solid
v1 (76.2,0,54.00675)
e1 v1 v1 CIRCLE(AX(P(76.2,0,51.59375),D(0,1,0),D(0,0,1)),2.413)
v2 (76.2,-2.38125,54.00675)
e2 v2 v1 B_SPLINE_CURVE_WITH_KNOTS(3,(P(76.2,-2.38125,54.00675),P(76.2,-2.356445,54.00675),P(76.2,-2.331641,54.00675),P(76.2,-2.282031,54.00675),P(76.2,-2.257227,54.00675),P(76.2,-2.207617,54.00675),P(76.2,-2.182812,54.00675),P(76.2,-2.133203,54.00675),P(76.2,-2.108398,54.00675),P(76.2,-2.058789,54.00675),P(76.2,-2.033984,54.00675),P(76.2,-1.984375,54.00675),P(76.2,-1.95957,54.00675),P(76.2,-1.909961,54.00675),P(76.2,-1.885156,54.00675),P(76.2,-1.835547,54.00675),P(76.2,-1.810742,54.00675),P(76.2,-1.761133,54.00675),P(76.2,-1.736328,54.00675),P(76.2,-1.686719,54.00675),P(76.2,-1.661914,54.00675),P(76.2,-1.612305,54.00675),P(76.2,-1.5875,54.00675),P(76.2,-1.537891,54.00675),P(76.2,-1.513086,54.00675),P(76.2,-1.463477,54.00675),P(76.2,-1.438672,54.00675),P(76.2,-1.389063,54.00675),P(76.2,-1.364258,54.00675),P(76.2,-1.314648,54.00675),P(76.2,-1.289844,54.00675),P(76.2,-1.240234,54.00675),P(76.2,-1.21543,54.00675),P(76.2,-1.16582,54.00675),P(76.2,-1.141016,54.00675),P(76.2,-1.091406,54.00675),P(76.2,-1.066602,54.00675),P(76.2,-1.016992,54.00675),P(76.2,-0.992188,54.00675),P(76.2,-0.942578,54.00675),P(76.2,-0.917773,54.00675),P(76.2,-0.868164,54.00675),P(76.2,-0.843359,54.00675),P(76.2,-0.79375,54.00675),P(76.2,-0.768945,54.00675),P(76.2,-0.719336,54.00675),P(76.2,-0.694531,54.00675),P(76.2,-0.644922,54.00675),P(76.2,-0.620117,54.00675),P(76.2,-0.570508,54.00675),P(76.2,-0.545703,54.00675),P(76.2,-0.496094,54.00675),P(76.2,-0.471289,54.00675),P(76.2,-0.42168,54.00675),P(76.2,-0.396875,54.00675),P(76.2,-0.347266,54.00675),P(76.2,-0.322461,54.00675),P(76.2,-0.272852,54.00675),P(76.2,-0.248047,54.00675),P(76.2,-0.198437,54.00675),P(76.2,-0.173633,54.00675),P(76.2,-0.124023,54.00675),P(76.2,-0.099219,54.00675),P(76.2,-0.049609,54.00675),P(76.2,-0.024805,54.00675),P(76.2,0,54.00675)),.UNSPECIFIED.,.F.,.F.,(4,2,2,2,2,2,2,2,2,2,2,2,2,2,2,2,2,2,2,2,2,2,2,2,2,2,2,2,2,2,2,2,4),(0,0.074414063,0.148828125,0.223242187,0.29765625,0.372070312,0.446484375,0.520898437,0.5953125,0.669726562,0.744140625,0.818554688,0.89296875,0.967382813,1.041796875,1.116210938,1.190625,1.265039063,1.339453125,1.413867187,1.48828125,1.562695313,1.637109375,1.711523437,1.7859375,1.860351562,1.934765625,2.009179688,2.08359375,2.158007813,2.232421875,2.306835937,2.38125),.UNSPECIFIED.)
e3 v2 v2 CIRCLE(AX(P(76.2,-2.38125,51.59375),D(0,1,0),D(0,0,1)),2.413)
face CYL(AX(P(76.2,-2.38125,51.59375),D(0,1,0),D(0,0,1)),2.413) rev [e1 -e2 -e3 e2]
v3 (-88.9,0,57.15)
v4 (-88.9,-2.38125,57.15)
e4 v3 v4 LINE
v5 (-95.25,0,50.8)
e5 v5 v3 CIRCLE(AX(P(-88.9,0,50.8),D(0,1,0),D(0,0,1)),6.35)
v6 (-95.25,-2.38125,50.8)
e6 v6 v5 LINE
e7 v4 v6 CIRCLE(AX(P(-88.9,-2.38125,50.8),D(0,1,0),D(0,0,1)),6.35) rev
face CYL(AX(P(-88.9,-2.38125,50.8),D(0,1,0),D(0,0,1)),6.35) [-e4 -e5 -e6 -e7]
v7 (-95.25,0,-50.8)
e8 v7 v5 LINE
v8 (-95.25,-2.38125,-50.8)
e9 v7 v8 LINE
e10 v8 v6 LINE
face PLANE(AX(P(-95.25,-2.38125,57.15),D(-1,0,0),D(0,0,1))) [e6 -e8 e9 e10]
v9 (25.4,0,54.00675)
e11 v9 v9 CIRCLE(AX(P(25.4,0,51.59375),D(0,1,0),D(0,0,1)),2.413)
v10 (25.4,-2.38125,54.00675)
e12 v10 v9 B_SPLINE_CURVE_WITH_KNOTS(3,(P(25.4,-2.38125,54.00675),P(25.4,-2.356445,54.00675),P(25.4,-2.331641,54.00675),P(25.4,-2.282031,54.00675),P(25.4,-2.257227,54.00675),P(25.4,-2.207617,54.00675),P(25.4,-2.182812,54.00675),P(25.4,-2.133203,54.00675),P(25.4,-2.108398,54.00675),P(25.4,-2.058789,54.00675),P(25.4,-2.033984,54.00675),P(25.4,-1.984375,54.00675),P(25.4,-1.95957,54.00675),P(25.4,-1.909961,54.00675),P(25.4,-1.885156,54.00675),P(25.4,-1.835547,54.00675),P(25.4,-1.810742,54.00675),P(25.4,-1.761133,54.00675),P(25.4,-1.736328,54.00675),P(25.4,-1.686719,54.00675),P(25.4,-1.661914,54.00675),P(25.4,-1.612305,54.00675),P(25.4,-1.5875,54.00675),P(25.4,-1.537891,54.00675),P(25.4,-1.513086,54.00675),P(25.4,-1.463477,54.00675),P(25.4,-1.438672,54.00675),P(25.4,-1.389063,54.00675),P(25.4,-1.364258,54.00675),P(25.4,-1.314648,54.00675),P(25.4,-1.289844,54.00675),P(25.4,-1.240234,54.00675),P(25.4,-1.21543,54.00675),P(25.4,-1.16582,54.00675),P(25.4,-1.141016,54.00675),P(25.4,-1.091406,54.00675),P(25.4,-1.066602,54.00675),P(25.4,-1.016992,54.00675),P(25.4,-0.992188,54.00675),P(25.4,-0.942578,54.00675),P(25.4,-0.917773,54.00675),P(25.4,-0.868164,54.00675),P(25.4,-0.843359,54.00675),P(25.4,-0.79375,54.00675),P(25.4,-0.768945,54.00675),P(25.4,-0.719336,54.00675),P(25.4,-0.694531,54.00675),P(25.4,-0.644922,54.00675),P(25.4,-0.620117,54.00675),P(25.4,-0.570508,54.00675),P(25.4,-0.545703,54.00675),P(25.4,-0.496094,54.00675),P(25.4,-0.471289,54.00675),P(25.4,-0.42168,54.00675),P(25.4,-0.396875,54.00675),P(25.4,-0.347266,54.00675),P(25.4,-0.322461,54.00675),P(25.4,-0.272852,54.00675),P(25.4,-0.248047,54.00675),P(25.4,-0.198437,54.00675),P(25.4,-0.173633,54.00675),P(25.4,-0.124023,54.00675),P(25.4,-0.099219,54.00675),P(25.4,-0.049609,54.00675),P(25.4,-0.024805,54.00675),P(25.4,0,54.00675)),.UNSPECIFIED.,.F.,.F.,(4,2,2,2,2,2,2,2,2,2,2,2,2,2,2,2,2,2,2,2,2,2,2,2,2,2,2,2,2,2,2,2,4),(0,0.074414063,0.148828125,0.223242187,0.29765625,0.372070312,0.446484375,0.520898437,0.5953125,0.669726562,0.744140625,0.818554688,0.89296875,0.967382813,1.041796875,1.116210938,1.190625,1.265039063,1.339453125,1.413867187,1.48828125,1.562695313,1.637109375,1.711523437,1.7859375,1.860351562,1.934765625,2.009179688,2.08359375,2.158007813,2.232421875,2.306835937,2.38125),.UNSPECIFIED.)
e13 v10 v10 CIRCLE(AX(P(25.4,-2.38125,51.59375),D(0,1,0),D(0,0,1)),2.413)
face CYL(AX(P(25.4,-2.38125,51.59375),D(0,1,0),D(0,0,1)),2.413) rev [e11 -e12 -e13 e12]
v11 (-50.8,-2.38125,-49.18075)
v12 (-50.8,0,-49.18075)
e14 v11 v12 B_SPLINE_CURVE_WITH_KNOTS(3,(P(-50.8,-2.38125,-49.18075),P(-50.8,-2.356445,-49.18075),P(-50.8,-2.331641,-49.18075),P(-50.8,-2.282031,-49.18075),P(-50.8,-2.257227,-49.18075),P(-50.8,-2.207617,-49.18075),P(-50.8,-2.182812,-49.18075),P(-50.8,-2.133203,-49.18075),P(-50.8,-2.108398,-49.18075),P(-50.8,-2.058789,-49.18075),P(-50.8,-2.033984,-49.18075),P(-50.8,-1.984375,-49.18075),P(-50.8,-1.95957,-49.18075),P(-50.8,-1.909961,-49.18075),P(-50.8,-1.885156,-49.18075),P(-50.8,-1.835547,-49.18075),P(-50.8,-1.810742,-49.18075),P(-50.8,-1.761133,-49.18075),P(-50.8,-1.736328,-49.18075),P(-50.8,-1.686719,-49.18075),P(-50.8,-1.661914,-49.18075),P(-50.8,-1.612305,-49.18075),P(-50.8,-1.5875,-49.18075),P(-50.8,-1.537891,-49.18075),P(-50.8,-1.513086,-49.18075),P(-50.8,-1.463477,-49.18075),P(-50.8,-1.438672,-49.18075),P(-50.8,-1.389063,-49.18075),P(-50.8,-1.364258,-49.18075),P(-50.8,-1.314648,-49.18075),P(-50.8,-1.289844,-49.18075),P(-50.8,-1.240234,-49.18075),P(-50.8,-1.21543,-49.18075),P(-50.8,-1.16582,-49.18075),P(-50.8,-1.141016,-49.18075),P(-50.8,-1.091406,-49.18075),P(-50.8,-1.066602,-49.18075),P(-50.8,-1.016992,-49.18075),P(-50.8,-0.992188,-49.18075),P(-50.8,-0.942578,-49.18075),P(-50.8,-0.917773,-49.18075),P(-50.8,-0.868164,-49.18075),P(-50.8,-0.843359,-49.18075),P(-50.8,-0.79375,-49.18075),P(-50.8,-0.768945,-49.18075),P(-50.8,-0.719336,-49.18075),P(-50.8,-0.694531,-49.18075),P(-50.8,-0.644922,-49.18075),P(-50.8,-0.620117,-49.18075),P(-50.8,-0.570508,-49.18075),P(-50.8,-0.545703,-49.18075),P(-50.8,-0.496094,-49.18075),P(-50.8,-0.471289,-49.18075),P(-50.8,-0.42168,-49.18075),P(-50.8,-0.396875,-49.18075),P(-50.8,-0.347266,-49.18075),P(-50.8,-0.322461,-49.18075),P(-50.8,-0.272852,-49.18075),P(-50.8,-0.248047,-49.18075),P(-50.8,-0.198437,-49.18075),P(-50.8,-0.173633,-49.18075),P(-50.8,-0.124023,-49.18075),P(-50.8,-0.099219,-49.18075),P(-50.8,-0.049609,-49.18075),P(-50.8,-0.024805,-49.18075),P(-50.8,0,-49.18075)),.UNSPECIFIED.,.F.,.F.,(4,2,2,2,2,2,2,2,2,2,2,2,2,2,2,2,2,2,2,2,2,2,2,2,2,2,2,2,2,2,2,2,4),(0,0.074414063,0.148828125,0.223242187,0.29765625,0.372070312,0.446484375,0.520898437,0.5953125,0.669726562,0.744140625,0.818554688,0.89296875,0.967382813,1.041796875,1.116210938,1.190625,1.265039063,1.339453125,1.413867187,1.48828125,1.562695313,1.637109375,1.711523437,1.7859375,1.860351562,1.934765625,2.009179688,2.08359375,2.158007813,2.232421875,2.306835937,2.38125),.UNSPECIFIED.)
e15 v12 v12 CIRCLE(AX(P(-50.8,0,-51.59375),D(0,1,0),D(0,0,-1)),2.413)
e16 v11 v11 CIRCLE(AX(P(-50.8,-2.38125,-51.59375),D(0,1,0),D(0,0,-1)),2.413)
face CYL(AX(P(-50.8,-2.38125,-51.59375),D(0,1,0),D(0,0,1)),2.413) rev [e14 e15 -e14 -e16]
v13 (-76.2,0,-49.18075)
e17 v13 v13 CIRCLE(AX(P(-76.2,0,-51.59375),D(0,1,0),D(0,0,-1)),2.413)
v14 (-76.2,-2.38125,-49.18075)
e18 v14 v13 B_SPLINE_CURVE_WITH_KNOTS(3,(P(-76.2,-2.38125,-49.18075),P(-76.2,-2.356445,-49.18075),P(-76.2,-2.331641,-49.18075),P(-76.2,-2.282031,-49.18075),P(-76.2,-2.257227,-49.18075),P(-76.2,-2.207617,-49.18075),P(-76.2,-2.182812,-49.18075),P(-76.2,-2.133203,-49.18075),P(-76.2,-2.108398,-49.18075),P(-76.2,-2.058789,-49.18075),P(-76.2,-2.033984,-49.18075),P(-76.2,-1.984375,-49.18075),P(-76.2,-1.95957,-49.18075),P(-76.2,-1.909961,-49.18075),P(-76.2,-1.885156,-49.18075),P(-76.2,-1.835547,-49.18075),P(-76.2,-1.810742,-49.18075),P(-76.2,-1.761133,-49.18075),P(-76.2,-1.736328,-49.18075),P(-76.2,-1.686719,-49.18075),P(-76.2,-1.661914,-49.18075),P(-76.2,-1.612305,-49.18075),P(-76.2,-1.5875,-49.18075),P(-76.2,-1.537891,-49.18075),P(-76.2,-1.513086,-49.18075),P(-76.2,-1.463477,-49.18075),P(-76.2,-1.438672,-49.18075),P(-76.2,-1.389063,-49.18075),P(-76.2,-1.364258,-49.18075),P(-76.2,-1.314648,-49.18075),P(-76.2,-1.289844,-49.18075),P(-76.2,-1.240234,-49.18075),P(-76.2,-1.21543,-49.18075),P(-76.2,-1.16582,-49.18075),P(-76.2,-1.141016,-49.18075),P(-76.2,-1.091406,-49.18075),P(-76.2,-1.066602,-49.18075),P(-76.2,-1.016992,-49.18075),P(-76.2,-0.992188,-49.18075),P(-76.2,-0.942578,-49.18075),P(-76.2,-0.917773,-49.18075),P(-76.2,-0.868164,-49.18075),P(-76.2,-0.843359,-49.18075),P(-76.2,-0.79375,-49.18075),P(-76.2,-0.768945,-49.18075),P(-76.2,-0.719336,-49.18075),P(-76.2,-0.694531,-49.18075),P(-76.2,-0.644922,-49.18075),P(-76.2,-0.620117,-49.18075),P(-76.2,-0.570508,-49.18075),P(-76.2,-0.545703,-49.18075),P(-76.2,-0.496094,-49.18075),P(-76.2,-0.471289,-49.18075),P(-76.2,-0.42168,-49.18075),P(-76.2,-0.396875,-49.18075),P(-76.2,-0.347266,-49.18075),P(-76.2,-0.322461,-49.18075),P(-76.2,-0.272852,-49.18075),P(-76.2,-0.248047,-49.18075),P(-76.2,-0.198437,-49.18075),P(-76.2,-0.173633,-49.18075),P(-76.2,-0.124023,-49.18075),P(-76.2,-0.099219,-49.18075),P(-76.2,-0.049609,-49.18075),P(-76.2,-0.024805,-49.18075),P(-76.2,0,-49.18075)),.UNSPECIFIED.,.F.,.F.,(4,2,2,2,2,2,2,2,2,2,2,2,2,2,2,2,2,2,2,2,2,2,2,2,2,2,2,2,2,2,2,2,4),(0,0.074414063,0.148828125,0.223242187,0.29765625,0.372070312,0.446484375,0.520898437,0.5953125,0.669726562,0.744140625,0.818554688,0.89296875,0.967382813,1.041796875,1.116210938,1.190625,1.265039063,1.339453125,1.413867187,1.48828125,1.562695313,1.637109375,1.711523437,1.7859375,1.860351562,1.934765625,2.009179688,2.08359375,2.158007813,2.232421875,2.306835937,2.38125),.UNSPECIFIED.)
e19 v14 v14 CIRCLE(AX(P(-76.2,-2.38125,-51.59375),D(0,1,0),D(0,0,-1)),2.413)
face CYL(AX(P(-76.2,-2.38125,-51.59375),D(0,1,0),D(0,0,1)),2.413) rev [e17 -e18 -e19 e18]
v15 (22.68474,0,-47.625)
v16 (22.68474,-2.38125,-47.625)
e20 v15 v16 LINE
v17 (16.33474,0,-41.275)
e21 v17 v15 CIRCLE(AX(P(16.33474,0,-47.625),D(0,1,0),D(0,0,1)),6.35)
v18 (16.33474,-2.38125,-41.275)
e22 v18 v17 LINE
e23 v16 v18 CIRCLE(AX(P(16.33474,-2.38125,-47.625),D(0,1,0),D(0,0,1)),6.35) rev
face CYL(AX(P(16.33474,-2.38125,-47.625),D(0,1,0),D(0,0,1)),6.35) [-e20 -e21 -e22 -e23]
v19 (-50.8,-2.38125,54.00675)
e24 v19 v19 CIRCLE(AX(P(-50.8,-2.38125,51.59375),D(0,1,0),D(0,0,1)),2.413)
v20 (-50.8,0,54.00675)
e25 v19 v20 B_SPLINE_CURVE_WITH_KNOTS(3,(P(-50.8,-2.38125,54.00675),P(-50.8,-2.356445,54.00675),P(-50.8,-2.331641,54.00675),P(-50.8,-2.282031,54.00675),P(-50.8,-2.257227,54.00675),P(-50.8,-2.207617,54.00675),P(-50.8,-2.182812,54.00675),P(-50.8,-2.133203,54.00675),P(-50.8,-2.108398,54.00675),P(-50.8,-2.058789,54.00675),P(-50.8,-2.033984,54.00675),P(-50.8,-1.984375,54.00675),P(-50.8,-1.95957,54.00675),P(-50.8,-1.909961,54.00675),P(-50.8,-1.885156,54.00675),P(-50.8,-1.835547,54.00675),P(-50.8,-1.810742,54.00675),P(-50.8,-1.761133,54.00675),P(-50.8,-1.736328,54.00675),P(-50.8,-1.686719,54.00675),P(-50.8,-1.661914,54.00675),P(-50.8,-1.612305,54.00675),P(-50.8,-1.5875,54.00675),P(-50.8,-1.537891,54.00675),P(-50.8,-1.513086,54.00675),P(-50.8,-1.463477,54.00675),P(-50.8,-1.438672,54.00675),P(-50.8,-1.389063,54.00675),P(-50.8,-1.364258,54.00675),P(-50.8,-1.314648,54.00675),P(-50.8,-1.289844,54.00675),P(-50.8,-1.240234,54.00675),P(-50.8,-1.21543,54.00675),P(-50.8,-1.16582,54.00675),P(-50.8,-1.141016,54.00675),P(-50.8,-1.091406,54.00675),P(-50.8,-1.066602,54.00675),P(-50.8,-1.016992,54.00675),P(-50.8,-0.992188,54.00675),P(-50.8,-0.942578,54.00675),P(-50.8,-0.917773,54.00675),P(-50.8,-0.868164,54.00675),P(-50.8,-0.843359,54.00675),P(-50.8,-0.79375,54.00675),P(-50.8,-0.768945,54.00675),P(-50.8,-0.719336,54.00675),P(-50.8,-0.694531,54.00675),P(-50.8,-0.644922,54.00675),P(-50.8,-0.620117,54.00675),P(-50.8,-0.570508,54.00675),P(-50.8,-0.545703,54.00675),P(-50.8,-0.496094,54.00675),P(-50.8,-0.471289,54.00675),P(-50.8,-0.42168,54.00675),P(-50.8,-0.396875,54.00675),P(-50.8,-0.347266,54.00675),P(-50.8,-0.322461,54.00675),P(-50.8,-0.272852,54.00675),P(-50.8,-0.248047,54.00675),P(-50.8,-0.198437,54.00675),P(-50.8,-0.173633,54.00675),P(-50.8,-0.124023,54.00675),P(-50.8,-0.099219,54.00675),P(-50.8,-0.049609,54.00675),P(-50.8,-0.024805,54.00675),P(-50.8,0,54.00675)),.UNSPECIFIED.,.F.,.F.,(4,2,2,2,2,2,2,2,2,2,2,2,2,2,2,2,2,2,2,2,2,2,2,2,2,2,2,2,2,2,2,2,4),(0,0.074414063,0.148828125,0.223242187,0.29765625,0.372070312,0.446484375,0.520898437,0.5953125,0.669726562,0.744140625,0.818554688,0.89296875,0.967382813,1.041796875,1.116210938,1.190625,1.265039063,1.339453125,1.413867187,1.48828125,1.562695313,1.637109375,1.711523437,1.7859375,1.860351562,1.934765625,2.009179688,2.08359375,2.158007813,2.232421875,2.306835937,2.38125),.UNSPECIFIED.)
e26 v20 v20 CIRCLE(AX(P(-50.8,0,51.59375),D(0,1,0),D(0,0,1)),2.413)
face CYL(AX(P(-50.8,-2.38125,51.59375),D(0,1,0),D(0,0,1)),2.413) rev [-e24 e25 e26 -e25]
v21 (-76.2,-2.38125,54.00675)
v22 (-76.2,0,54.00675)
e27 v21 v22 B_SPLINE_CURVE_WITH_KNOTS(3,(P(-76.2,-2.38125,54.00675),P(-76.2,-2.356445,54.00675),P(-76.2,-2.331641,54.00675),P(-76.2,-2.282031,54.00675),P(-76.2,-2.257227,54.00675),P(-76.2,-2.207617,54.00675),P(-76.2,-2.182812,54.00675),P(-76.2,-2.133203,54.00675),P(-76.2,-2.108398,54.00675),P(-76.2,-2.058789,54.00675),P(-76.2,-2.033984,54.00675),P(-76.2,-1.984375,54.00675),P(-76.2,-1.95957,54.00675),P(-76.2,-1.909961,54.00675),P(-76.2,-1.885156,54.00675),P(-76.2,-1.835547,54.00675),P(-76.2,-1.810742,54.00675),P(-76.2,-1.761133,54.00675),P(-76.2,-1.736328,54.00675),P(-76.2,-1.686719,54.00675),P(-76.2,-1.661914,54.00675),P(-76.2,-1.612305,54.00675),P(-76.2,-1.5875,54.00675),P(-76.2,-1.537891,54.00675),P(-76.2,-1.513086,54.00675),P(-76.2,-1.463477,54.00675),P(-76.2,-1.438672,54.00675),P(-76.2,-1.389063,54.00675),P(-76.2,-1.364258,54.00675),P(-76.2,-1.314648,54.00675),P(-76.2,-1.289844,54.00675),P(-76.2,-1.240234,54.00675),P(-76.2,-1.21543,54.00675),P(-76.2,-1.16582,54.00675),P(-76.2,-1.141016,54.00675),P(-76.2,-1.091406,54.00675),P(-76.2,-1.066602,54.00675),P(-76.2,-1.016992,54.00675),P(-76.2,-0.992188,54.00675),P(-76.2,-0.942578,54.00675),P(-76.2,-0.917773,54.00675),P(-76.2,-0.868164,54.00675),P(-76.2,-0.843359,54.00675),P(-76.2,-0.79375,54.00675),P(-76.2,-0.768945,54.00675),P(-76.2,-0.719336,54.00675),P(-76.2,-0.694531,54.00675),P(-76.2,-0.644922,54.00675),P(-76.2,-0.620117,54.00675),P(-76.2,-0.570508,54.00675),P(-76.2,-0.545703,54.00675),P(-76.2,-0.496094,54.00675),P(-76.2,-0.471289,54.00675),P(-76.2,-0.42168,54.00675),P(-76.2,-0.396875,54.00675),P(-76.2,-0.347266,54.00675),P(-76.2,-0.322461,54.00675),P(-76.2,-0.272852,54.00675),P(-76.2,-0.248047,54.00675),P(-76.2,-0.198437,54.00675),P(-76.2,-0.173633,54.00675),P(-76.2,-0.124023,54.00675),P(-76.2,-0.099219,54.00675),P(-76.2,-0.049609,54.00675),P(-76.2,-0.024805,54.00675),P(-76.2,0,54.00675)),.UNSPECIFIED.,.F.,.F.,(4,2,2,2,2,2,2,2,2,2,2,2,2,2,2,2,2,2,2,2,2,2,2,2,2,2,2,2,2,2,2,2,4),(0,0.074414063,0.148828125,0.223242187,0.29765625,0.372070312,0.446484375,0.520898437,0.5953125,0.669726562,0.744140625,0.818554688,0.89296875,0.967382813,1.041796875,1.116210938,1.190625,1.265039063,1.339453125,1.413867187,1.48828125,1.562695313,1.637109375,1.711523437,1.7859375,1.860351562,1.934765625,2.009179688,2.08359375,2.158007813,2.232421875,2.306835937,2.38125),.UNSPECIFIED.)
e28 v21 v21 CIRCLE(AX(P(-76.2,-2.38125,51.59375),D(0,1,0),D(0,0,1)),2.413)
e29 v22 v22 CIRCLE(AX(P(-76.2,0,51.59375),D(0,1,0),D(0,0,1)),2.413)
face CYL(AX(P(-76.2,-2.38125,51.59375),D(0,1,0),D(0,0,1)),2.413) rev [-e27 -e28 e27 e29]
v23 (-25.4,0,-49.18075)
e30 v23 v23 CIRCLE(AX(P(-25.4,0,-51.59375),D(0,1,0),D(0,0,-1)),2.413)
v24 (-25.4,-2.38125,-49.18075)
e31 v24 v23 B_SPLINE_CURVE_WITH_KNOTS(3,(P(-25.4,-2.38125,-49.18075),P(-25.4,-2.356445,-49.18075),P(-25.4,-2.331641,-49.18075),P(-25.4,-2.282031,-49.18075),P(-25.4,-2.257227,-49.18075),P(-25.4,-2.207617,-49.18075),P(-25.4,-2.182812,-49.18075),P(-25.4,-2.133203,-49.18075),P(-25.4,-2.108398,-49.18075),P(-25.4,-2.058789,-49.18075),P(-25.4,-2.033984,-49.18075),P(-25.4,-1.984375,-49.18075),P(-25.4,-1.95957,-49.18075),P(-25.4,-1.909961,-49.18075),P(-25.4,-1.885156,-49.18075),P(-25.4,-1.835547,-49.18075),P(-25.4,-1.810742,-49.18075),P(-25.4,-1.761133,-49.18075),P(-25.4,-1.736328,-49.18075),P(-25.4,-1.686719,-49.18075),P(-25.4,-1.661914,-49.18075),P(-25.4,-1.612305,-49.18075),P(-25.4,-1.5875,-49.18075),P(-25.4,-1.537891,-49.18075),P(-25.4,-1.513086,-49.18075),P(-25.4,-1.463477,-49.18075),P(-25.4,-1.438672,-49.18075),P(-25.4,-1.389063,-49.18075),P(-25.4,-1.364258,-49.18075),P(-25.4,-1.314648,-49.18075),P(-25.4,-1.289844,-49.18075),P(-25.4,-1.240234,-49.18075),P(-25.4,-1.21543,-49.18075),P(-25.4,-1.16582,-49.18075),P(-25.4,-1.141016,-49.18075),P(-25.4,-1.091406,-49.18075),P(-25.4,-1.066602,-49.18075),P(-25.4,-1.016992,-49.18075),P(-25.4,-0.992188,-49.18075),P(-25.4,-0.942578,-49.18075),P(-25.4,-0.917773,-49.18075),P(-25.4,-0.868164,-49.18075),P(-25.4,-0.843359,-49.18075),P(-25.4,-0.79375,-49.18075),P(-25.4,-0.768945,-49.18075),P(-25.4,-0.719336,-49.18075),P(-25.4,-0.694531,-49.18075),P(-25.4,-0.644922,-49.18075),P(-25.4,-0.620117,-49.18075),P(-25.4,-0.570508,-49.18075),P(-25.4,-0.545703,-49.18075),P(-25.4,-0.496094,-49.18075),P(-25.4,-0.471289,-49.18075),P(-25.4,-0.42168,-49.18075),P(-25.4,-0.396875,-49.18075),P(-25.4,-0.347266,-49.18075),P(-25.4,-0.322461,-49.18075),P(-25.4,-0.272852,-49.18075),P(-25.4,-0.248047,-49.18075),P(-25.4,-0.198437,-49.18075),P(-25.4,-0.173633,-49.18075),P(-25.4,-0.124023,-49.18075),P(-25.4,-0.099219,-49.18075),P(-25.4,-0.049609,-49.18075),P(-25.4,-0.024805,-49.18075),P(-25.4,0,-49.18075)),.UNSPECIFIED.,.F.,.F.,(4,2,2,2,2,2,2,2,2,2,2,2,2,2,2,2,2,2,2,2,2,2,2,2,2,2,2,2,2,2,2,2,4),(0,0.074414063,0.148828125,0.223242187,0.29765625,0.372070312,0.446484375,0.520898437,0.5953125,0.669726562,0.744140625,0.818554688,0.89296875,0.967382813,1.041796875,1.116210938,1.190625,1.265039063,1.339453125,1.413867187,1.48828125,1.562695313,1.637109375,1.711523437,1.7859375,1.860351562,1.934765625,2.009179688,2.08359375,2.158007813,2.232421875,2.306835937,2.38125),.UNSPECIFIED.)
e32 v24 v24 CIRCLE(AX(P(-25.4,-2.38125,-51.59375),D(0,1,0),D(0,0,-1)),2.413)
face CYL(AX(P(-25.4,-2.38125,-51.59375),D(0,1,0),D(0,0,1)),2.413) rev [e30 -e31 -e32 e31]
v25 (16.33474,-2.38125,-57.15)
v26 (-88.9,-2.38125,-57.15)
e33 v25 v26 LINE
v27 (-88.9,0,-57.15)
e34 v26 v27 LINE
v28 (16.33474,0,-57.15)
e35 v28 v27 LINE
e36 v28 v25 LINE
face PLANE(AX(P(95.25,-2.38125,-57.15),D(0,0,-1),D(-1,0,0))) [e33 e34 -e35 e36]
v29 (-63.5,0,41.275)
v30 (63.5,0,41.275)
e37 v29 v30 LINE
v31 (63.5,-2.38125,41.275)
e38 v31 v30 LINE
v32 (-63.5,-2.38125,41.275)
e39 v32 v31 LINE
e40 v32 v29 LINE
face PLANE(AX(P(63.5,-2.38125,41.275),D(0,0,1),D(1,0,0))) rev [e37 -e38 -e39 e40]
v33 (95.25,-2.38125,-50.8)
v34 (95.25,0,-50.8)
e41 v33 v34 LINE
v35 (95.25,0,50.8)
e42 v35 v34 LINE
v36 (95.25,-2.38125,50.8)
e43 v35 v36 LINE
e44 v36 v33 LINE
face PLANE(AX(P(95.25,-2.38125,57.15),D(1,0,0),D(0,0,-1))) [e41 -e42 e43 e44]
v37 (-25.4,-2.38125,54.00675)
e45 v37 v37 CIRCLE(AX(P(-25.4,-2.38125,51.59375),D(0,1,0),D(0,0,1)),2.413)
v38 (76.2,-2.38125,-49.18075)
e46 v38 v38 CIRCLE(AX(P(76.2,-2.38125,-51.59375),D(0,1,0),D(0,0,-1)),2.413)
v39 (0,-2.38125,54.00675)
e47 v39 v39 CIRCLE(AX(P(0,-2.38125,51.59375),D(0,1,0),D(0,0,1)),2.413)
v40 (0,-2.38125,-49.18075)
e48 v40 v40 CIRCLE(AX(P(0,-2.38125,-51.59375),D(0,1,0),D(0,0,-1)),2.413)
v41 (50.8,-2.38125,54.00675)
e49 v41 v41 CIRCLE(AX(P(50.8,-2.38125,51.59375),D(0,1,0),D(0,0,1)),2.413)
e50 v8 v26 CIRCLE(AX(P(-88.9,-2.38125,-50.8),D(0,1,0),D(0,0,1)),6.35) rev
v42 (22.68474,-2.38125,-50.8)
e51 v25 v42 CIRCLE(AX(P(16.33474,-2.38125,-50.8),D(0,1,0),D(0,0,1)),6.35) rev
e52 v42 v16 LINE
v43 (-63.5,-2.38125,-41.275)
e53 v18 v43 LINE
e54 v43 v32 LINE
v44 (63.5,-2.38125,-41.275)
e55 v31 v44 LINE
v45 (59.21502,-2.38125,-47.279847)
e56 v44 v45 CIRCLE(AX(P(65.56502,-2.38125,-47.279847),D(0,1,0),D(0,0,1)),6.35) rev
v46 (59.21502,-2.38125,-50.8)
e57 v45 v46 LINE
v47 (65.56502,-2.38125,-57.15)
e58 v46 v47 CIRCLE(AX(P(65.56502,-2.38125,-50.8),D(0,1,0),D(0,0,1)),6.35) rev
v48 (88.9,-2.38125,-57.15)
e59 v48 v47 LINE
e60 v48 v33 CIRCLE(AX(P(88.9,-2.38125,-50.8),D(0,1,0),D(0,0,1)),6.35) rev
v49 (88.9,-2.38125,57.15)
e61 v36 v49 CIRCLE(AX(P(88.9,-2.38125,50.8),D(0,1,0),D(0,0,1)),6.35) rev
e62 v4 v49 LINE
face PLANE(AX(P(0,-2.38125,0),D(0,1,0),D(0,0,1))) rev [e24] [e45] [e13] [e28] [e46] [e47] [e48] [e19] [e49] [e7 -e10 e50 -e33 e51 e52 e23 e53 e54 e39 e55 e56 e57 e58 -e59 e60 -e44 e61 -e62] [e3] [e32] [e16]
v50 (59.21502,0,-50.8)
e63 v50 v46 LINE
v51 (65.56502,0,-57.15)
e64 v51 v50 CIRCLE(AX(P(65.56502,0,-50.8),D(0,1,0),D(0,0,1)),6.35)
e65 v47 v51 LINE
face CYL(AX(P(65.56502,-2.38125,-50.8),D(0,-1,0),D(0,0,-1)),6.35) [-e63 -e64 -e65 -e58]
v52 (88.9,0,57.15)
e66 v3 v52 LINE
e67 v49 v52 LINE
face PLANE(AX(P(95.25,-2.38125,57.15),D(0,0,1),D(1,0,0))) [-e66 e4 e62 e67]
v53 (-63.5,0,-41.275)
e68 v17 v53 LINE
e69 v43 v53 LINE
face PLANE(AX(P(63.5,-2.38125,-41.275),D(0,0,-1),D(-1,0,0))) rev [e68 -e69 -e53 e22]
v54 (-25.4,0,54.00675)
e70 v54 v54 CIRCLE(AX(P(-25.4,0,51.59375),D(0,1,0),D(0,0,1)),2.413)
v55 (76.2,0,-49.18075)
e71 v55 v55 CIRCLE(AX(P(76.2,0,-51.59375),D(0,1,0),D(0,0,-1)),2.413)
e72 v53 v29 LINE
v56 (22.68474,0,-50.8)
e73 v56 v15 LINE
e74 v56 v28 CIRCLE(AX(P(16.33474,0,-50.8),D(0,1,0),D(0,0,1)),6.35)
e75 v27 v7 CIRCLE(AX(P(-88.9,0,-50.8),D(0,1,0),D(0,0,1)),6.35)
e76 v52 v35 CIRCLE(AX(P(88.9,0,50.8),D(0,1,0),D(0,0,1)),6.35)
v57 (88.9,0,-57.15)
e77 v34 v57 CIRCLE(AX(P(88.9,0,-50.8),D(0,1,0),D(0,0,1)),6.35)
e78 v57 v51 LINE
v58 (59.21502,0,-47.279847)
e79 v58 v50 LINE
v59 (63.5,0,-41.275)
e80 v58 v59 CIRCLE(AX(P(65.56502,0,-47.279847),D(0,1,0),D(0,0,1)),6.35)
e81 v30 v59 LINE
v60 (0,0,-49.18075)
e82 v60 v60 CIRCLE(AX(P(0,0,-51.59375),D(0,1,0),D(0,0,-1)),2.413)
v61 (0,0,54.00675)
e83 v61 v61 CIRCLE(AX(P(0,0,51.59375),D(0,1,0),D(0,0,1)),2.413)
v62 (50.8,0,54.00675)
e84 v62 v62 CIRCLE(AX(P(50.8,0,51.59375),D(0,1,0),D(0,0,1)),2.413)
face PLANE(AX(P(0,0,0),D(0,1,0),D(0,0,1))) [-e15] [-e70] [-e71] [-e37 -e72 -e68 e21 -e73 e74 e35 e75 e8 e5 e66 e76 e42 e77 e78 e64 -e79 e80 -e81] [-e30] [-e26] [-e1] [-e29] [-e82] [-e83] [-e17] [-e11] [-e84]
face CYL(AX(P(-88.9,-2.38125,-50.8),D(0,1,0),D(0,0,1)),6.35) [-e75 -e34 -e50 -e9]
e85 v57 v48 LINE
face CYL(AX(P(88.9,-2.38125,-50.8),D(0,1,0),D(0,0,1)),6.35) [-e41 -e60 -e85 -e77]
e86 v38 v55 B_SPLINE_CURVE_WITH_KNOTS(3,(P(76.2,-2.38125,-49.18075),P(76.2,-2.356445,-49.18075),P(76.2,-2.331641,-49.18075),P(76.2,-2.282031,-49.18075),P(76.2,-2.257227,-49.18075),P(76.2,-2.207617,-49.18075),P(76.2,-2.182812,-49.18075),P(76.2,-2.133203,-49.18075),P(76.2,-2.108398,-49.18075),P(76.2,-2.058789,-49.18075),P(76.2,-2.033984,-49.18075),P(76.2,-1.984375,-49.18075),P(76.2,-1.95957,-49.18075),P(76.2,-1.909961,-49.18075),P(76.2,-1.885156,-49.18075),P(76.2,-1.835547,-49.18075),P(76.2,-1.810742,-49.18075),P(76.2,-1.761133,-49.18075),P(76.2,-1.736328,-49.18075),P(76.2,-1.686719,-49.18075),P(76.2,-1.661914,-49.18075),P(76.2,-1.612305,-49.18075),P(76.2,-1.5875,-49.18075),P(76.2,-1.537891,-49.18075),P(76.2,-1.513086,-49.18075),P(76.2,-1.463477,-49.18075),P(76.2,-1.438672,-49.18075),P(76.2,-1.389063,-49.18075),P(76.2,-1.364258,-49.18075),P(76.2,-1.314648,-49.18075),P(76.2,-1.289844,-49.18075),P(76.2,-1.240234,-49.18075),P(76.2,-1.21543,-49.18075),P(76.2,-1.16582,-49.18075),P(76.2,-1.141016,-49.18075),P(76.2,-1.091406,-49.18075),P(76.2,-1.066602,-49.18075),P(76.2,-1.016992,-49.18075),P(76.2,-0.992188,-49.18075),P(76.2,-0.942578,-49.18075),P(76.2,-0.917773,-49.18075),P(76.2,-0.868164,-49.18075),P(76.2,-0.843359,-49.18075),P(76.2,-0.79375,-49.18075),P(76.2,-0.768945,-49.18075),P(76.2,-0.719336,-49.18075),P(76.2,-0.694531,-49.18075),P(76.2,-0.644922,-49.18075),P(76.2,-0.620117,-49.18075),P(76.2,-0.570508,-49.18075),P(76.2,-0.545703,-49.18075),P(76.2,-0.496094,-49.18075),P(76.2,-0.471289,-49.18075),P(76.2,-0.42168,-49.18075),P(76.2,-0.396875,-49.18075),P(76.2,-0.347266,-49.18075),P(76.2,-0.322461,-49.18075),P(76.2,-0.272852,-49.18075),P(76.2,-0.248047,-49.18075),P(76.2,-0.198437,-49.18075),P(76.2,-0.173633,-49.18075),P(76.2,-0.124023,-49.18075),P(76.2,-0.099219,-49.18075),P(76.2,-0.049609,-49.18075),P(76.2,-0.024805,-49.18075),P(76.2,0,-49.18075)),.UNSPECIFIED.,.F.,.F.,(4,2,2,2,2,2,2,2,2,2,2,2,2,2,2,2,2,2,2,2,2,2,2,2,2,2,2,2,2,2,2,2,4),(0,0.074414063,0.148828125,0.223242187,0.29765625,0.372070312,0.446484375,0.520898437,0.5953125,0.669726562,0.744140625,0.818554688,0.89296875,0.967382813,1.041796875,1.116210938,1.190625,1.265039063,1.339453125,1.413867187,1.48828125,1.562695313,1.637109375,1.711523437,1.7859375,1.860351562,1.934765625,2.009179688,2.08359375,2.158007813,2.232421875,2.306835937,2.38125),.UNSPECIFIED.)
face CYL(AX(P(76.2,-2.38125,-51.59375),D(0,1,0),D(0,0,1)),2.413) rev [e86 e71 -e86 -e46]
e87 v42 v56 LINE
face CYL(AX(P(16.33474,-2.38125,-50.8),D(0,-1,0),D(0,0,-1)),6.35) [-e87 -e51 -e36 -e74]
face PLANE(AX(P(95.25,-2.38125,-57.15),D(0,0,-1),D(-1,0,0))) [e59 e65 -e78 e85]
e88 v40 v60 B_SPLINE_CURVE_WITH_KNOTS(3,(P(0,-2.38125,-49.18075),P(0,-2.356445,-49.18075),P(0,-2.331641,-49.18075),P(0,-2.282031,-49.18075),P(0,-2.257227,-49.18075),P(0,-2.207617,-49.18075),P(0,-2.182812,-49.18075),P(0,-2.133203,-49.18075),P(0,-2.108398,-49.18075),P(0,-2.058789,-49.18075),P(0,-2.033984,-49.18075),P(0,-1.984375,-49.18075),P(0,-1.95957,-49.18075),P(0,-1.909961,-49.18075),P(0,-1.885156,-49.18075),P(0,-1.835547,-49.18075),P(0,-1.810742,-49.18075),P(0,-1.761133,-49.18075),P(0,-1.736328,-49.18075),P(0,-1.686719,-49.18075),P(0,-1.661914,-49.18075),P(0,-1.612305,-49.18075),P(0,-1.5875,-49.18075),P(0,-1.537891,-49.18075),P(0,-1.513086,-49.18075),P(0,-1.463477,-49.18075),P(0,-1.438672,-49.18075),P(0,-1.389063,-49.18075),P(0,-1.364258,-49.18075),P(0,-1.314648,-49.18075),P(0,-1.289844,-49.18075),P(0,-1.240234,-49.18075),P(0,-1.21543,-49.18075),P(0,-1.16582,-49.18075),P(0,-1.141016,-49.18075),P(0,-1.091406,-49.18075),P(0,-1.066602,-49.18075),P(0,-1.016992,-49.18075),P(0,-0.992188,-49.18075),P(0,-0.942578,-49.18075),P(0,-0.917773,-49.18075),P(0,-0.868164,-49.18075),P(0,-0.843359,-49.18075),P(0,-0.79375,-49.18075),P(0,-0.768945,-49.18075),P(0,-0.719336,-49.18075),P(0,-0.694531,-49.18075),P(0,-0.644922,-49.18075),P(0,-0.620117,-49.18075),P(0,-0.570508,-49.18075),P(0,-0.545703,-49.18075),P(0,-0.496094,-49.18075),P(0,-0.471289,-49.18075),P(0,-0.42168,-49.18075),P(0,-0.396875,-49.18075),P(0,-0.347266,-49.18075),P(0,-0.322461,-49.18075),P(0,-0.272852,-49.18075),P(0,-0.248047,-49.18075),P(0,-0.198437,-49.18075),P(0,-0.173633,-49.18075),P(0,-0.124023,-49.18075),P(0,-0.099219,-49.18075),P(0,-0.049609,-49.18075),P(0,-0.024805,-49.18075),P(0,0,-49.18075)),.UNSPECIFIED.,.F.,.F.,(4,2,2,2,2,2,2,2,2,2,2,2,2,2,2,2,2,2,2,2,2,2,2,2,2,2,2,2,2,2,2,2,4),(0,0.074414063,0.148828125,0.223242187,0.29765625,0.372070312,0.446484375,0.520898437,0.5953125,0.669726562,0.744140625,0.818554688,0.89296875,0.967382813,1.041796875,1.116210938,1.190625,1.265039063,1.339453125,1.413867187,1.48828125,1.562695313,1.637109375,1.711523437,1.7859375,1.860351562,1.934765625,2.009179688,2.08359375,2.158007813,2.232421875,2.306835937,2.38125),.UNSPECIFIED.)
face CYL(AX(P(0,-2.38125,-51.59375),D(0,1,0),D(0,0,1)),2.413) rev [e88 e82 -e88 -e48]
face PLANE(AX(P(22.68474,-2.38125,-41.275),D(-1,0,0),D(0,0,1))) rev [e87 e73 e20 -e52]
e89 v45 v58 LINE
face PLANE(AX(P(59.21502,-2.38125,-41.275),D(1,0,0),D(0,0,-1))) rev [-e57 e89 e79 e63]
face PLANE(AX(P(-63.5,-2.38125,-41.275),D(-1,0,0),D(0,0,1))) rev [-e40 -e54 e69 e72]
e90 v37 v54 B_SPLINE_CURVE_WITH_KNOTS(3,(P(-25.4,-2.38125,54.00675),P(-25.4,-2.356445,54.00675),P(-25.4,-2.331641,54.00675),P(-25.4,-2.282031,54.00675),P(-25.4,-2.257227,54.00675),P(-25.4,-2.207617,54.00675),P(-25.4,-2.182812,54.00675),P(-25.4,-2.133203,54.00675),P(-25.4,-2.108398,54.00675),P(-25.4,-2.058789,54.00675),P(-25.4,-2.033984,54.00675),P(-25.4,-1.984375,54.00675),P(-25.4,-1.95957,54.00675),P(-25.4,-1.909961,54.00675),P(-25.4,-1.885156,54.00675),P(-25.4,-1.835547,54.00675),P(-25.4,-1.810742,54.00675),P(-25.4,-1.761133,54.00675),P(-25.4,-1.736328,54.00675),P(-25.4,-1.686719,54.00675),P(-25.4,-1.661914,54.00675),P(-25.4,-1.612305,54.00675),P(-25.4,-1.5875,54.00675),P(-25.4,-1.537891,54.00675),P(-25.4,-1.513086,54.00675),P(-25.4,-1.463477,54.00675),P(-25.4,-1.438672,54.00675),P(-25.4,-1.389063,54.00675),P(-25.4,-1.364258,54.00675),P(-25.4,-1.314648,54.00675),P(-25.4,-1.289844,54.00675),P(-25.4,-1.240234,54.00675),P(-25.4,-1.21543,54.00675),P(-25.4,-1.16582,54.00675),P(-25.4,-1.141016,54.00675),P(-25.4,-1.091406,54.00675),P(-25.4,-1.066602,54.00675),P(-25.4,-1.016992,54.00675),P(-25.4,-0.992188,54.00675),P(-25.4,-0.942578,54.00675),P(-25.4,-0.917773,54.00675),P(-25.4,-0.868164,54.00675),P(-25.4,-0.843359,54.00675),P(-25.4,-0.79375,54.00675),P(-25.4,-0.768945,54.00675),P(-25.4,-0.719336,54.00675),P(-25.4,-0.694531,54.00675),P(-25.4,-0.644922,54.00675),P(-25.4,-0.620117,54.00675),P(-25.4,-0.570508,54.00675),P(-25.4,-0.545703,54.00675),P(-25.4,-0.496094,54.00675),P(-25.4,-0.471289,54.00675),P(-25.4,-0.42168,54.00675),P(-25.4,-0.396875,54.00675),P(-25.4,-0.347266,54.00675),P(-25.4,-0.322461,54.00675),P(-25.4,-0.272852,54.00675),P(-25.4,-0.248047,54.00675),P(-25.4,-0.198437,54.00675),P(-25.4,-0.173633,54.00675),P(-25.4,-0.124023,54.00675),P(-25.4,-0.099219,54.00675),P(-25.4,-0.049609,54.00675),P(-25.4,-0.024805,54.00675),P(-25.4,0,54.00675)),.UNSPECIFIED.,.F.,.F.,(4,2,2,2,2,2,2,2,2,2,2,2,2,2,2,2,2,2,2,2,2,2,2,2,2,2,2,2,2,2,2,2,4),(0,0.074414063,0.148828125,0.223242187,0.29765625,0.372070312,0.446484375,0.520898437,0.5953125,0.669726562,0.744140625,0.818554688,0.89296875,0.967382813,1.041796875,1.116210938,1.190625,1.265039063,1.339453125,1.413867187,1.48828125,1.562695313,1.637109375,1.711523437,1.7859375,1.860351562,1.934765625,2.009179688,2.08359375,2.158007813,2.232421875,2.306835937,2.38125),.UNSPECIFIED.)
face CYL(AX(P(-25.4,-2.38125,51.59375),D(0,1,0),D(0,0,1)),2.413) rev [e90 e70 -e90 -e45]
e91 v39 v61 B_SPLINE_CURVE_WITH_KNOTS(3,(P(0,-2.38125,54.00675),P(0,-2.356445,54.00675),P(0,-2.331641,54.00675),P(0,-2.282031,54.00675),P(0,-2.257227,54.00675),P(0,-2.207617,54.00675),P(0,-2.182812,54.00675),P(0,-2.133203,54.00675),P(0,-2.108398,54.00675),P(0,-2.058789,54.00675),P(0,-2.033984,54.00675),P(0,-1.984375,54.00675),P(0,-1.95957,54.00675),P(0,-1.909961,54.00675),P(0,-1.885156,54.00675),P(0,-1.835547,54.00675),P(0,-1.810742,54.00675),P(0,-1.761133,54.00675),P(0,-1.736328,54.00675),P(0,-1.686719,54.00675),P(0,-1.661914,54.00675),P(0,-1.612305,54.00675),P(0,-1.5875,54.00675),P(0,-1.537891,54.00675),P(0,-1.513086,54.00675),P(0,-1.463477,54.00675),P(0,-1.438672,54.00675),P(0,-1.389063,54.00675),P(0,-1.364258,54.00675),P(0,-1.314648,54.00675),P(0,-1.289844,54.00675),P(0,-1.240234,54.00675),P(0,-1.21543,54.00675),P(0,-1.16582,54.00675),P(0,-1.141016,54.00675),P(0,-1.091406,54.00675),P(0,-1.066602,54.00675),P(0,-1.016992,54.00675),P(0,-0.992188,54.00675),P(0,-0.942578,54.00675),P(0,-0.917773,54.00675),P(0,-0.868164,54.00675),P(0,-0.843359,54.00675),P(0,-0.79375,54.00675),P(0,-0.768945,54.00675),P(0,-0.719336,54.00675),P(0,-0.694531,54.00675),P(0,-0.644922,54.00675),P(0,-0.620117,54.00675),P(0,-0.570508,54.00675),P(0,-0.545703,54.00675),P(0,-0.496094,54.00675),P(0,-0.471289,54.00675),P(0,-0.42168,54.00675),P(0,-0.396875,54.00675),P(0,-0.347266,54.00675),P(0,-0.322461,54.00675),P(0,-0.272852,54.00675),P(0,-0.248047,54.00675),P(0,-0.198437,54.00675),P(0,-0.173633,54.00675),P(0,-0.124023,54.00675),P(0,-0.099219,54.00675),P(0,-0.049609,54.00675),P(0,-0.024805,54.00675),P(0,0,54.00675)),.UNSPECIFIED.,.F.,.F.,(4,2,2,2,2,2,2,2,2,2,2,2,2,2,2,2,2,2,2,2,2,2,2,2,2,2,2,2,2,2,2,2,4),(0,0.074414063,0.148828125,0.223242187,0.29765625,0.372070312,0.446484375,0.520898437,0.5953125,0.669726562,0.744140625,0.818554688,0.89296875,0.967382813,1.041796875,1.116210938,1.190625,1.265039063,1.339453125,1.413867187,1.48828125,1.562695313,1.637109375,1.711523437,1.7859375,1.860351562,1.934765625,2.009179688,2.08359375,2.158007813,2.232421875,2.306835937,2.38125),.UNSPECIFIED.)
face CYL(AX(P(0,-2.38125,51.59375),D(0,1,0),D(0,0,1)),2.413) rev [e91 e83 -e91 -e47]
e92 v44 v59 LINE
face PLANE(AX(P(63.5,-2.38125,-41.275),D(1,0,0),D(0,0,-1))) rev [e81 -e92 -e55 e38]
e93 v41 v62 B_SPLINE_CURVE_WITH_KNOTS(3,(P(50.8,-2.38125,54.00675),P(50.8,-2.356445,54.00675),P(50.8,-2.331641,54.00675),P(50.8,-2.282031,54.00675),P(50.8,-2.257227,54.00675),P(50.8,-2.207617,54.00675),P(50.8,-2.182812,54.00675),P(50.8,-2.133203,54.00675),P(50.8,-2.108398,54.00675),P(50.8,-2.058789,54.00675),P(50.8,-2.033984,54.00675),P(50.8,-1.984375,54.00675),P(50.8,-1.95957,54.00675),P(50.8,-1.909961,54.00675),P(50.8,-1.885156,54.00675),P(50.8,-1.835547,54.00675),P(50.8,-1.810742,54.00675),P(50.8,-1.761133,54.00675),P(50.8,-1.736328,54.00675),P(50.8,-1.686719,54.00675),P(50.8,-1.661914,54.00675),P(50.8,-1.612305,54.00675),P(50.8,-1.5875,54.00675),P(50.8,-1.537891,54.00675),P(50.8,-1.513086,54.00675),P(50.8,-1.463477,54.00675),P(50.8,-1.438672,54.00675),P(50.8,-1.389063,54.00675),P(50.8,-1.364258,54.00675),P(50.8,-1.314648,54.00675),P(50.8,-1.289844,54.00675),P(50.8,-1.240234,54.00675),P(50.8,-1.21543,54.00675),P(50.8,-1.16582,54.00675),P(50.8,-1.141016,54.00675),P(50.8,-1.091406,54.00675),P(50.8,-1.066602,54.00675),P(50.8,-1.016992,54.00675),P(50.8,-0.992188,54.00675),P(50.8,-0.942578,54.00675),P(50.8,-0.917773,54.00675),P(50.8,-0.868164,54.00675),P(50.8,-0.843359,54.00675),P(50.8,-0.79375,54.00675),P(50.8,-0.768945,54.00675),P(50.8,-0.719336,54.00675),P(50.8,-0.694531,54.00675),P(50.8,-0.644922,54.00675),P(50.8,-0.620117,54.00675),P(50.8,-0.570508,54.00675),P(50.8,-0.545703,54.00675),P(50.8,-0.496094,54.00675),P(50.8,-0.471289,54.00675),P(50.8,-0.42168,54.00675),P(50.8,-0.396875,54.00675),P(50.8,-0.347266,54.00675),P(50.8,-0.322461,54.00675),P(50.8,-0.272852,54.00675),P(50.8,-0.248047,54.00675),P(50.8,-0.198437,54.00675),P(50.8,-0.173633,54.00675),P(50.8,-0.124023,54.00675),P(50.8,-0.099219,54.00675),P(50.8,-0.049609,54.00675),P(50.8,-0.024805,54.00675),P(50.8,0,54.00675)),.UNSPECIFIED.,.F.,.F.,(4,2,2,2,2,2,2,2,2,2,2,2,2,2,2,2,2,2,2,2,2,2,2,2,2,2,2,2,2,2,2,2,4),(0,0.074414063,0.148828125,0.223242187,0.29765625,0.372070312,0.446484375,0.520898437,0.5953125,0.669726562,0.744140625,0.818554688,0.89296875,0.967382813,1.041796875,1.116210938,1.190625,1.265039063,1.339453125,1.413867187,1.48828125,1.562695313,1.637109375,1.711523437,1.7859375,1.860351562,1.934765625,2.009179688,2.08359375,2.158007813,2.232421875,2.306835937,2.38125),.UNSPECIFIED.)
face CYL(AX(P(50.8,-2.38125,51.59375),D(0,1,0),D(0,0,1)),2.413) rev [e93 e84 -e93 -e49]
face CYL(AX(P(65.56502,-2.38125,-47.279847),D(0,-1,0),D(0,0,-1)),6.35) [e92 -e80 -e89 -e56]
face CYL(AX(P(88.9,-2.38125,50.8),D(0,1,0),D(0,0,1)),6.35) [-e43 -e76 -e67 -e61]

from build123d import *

# Parameters (mm, degrees)
SKETCH1_W          = 190.5
SKETCH1_H          = 114.3
SKETCH1_R          = 2.413
SKETCH1_W_2        = 127
SKETCH1_H_2        = 82.55
BASE_FLANGE1_DEPTH = 2.38125
FILLET1_R          = 6.35
SKETCH2_W          = 36.53028
SKETCH2_H          = 15.875
CUT_EXTRUDE1_DEPTH = 2.54
FILLET2_R          = 6.35


# Sheet-metal steps are written as plain solids
with BuildPart() as part:
    # Sketch1 → Base-Flange1 (new body)
    with BuildSketch(Plane(origin=(0, 0, 0), x_dir=(1, 0, 0), z_dir=(0, 1, 0))):
        Rectangle(SKETCH1_W, SKETCH1_H)
        with Locations(Location((-76.2, -51.59375, 0), (0, 0, 270))):
            Circle(SKETCH1_R, mode=Mode.SUBTRACT)
        with Locations(Location((-50.8, -51.59375, 0), (0, 0, 270))):
            Circle(SKETCH1_R, mode=Mode.SUBTRACT)
        with Locations(Location((-25.4, -51.59375, 0), (0, 0, 270))):
            Circle(SKETCH1_R, mode=Mode.SUBTRACT)
        with Locations(Location((0, -51.59375, 0), (0, 0, 270))):
            Circle(SKETCH1_R, mode=Mode.SUBTRACT)
        with Locations(Location((25.4, -51.59375, 0), (0, 0, 270))):
            Circle(SKETCH1_R, mode=Mode.SUBTRACT)
        with Locations(Location((50.8, -51.59375, 0), (0, 0, 270))):
            Circle(SKETCH1_R, mode=Mode.SUBTRACT)
        with Locations(Location((76.2, -51.59375, 0), (0, 0, 270))):
            Circle(SKETCH1_R, mode=Mode.SUBTRACT)
        with Locations(Location((76.2, 51.59375, 0), (0, 0, 270))):
            Circle(SKETCH1_R, mode=Mode.SUBTRACT)
        with Locations(Location((50.8, 51.59375, 0), (0, 0, 270))):
            Circle(SKETCH1_R, mode=Mode.SUBTRACT)
        with Locations(Location((25.4, 51.59375, 0), (0, 0, 270))):
            Circle(SKETCH1_R, mode=Mode.SUBTRACT)
        with Locations(Location((0, 51.59375, 0), (0, 0, 270))):
            Circle(SKETCH1_R, mode=Mode.SUBTRACT)
        with Locations(Location((-25.4, 51.59375, 0), (0, 0, 270))):
            Circle(SKETCH1_R, mode=Mode.SUBTRACT)
        with Locations(Location((-50.8, 51.59375, 0), (0, 0, 270))):
            Circle(SKETCH1_R, mode=Mode.SUBTRACT)
        with Locations(Location((-76.2, 51.59375, 0), (0, 0, 270))):
            Circle(SKETCH1_R, mode=Mode.SUBTRACT)
        Rectangle(SKETCH1_W_2, SKETCH1_H_2, mode=Mode.SUBTRACT)
    extrude(amount=-BASE_FLANGE1_DEPTH)

    # Fillet1
    fillet1_edges = [part.edges().sort_by_distance(p)[0] for p in [
        (-95.25, -1.190625, -57.15),
        (95.25, -1.190625, -57.15),
        (95.25, -1.190625, 57.15),
        (-95.25, -1.190625, 57.15),
    ]]
    fillet(fillet1_edges, radius=FILLET1_R)

    # Sketch2 → Cut-Extrude1 (cut)
    with BuildSketch(Plane(origin=(0, 0, 0), x_dir=(1, 0, 0), z_dir=(0, 1, 0))):
        with Locations((40.94988, 49.2125)):
            Rectangle(SKETCH2_W, SKETCH2_H)
    extrude(amount=-CUT_EXTRUDE1_DEPTH, mode=Mode.SUBTRACT)

    # Fillet2
    # the kernel refuses this fillet: 6.35 mm, written as the material it takes off along each edge
    with BuildSketch(Plane(origin=(59.21502, 15.012118521, -41.275), x_dir=(0, 0, -1), z_dir=(0, -1, 0))) as fillet2_piece_1:
        with BuildLine():
            CenterArc((6.004847409, 6.35), FILLET2_R, 198.977692365, 71.022307635)
            Line((0, 4.28498), (-0.120096948, 4.2436796))
            ThreePointArc((-0.120096948, 4.2436796), (-0.127, 2.14249), (-0.127, 0))
            Line((-0.127, 0), (0, -0.127))
            Line((0, -0.127), (6.004847409, -0.127))
            Line((6.004847409, -0.127), (6.004847409, 0))
        make_face()
    extrude(amount=32.405487043, mode=Mode.SUBTRACT)
    with BuildSketch(Plane(origin=(22.68474, 15.875, -41.275), x_dir=(-1, 0, 0), z_dir=(0, -1, 0)), Plane(origin=(22.68474, 15.875, -57.15), x_dir=(0, 0, 1), z_dir=(0, -1, 0)), Plane(origin=(59.21502, 15.875, -57.15), x_dir=(1, 0, 0), z_dir=(0, -1, 0))) as fillet2_piece_2:
        with BuildLine():
            CenterArc((FILLET2_R, FILLET2_R), FILLET2_R, 180, 90)
            Line((0, FILLET2_R), (-FILLET2_R * 0.02, FILLET2_R))
            Line((-FILLET2_R * 0.02, FILLET2_R), (-FILLET2_R * 0.02, -FILLET2_R * 0.02))
            Line((-FILLET2_R * 0.02, -FILLET2_R * 0.02), (FILLET2_R, -FILLET2_R * 0.02))
            Line((FILLET2_R, -FILLET2_R * 0.02), (FILLET2_R, 0))
        make_face()
    extrude(amount=34.13125, mode=Mode.SUBTRACT)


solid = part.part
